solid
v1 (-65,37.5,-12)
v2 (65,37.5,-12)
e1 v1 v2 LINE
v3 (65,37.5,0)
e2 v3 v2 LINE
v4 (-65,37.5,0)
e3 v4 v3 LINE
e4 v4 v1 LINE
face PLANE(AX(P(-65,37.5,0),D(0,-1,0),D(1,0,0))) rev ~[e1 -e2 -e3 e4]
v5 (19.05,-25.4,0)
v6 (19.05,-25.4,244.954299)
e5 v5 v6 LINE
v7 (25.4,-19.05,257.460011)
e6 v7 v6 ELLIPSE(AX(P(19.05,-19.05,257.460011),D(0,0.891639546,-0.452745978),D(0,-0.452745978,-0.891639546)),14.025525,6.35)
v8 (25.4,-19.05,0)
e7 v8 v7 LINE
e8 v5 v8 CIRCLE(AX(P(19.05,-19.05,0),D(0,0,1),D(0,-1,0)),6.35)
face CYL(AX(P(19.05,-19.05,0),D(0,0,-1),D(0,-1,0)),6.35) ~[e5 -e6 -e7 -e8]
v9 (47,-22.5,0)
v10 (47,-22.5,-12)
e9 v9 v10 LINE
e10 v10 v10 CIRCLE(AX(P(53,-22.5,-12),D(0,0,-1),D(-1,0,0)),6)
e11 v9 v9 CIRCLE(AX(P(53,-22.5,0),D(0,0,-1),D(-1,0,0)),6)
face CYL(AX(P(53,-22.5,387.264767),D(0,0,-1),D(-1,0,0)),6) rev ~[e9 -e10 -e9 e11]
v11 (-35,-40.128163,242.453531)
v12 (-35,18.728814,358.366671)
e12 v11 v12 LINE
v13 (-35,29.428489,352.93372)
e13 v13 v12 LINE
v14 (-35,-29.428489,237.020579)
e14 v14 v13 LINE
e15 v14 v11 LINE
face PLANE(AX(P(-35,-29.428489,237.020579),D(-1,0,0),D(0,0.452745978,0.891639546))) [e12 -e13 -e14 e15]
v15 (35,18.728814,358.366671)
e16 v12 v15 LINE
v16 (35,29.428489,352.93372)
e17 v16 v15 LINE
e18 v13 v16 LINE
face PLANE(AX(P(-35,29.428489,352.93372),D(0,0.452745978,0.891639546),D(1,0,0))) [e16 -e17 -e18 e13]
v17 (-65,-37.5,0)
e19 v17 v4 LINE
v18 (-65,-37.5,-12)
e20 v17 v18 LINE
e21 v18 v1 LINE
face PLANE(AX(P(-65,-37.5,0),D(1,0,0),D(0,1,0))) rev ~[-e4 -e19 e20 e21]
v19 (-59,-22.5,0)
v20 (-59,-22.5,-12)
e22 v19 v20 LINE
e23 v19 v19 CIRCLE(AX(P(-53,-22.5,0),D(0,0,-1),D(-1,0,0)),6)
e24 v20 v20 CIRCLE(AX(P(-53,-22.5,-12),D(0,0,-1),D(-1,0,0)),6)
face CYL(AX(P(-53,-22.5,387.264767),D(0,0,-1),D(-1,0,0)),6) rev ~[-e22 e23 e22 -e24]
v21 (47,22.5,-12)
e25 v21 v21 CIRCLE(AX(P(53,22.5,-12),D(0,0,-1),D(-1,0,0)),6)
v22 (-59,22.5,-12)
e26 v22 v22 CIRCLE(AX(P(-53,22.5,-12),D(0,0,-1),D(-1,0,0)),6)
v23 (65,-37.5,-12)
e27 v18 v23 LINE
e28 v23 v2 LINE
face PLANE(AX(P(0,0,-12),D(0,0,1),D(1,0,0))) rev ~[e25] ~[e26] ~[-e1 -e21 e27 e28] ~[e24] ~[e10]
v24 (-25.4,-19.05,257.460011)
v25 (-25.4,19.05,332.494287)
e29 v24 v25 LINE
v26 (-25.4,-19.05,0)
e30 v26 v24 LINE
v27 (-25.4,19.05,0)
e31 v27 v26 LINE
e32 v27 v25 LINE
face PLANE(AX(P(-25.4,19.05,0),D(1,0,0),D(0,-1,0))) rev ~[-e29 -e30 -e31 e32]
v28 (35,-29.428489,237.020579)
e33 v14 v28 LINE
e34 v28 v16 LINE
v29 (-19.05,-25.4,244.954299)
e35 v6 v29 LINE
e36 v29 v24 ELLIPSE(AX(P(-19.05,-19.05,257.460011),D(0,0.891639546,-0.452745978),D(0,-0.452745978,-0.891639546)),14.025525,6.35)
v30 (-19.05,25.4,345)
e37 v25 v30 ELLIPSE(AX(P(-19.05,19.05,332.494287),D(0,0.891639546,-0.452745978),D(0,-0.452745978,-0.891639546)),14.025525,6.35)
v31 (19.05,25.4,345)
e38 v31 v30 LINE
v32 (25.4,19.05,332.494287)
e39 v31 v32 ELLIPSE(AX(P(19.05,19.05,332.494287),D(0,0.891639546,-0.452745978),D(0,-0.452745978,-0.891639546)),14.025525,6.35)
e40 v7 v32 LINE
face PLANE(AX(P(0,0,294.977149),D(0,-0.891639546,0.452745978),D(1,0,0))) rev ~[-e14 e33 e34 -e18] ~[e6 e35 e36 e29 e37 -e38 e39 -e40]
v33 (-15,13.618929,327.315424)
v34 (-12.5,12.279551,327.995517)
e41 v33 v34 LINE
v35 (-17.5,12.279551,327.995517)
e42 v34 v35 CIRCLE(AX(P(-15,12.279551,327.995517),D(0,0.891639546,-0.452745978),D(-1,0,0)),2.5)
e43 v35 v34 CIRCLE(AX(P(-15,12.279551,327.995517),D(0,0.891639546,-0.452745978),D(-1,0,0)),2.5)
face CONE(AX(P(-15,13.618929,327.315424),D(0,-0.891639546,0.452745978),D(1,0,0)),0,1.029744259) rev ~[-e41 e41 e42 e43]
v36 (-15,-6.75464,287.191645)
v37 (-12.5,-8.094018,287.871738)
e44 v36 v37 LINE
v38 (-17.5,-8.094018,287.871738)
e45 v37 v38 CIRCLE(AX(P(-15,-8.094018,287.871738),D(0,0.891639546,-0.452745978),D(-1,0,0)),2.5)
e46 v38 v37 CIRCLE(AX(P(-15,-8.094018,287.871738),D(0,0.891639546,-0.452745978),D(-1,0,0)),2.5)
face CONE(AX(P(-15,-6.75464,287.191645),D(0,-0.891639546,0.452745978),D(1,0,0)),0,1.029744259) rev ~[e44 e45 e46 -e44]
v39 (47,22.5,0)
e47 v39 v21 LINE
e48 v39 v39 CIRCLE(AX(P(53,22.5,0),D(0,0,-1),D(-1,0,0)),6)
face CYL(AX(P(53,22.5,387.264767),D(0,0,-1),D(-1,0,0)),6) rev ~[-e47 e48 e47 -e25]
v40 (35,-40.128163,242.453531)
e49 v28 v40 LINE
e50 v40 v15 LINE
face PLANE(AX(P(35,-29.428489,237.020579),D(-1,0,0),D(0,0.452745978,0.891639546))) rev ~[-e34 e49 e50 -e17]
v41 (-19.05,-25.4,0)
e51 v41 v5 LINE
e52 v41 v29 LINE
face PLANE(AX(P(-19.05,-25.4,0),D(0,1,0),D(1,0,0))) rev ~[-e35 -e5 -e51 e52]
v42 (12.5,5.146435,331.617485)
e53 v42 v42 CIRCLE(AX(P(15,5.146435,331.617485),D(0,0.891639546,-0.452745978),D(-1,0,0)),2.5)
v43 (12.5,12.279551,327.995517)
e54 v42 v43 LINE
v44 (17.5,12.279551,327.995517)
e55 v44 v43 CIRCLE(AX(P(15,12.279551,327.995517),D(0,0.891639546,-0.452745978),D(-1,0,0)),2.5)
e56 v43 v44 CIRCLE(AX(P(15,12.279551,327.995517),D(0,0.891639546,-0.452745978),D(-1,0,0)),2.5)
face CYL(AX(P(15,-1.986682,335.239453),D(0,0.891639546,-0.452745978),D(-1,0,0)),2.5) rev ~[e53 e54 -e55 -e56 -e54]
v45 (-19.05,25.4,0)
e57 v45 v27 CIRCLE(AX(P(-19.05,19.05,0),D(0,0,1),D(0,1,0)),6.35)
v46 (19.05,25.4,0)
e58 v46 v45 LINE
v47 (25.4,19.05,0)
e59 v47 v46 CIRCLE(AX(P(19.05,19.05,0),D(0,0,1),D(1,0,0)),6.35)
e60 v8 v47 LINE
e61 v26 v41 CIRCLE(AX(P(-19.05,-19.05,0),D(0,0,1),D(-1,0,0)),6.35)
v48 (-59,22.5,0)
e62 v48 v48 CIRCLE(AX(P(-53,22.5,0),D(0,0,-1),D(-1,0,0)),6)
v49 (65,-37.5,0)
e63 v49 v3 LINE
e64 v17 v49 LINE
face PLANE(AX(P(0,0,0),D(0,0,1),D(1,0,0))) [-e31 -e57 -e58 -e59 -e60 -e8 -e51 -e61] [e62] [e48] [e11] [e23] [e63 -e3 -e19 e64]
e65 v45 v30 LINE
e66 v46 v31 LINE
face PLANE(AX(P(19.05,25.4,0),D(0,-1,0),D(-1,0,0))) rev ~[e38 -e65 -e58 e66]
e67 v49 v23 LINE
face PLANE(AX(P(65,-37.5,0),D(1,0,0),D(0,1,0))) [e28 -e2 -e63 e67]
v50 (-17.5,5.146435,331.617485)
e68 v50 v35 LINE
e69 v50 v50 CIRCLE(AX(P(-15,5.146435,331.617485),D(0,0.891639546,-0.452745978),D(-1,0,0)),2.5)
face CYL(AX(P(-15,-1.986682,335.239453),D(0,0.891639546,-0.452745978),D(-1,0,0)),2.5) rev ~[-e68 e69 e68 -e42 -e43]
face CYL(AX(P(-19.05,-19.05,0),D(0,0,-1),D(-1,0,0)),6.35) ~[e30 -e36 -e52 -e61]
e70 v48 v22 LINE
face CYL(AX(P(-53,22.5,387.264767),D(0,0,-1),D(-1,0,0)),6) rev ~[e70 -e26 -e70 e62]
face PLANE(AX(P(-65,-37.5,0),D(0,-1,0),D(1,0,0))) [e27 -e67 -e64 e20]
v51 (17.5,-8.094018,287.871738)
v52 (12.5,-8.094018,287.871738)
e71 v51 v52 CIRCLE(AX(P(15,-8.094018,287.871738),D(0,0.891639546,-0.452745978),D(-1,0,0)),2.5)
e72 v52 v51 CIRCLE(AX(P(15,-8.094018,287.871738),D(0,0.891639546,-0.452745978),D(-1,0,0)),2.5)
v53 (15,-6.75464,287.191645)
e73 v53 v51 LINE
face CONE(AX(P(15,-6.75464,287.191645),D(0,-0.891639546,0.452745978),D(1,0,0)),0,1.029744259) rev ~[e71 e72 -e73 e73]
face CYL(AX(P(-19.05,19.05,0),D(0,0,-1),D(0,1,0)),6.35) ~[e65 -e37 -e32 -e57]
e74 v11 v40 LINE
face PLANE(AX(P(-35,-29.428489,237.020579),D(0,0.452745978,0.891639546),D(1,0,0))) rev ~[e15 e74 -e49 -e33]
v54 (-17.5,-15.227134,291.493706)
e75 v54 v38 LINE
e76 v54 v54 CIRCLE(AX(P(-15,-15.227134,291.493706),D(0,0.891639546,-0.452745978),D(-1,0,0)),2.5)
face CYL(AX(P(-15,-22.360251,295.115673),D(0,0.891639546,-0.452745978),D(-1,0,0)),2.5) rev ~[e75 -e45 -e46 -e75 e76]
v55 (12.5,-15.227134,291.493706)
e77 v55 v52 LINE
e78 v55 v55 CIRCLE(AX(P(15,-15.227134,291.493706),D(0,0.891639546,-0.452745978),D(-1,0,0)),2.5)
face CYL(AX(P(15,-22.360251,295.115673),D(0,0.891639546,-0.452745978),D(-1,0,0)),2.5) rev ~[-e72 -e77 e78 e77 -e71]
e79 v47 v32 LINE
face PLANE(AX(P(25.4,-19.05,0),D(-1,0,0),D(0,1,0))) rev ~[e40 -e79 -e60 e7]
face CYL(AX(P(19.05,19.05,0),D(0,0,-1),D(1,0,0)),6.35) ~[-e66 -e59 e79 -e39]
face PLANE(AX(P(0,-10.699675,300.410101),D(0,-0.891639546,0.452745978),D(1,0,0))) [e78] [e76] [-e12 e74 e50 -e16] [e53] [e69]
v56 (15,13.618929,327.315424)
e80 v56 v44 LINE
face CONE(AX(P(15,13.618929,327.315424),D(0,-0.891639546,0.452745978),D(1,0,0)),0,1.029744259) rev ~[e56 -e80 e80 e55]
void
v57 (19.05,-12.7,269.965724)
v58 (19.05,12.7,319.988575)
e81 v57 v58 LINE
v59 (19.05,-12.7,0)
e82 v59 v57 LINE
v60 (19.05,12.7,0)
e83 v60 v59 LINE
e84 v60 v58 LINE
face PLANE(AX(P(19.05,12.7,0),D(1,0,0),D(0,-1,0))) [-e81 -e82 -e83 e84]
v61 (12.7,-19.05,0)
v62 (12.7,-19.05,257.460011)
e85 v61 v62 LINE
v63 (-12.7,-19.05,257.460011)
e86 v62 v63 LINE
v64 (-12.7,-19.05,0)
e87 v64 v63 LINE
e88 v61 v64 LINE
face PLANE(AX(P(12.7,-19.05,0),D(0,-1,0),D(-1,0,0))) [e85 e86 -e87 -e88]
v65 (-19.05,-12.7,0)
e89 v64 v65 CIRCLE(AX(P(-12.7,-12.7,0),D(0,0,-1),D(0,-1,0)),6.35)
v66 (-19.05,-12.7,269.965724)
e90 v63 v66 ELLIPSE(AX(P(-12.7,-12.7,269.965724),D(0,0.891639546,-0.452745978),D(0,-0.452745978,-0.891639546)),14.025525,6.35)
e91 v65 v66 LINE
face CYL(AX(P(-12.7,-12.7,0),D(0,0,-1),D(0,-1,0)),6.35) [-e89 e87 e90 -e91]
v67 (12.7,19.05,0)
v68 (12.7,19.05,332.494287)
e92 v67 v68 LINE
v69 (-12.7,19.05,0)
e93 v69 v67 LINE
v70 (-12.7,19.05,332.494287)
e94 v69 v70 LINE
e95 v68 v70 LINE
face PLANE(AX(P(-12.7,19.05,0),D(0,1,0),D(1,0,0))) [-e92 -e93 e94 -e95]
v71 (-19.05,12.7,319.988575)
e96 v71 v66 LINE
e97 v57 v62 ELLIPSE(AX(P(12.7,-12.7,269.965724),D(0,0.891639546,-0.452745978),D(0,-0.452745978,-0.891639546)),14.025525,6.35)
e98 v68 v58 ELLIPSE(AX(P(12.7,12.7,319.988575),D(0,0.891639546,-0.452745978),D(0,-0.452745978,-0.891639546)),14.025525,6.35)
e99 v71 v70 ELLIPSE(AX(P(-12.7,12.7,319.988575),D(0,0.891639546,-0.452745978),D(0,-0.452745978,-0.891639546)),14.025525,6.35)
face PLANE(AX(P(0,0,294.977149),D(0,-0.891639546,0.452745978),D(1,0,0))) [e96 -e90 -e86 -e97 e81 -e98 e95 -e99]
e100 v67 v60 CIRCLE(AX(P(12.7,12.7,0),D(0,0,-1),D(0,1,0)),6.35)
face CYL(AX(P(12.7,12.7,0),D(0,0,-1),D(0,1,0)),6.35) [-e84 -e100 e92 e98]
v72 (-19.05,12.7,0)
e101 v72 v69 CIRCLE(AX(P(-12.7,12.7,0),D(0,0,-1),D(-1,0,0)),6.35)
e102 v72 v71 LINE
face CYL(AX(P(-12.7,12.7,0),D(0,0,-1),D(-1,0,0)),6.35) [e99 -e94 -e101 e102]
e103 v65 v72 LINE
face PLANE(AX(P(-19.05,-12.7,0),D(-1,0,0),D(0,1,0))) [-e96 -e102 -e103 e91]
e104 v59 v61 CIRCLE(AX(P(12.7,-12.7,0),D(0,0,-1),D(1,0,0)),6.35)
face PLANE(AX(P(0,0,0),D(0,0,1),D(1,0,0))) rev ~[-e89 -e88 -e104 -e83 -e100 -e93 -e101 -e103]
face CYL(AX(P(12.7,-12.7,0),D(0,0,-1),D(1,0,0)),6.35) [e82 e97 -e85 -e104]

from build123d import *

# Parameters (mm, degrees)
F0_W      = 130
F0_H      = 75
F1_DEPTH  = 12
F3_DEPTH  = 345
F5_D      = 12
F7_DEPTH  = 50.8
F8_W      = 70
F8_H      = 130
F9_DEPTH  = 12
F11_D     = 5
F11_DEPTH = 8
F11_TIP   = 1.5021515476


with BuildPart() as f1:
    # F0 (on Top) → F1 (new body)
    with BuildSketch(Plane.XY):
        Rectangle(F0_W, F0_H)
    extrude(amount=-F1_DEPTH)

    # F2 (on face) → F3 (join)
    with BuildSketch(Plane.XY):
        with BuildLine():
            Line((-19.05, -25.4), (19.05, -25.4))
            ThreePointArc((19.05, -25.4), (23.5401280605, -23.5401280605), (25.4, -19.05))
            Line((25.4, -19.05), (25.4, 19.05))
            ThreePointArc((25.4, 19.05), (23.5401280605, 23.5401280605), (19.05, 25.4))
            Line((19.05, 25.4), (-19.05, 25.4))
            ThreePointArc((-19.05, 25.4), (-23.5401280605, 23.5401280605), (-25.4, 19.05))
            Line((-25.4, 19.05), (-25.4, -19.05))
            ThreePointArc((-25.4, -19.05), (-23.5401280605, -23.5401280605), (-19.05, -25.4))
        make_face()
        with BuildLine():
            Line((-12.7, 19.05), (12.7, 19.05))
            ThreePointArc((12.7, 19.05), (17.1901280605, 17.1901280605), (19.05, 12.7))
            Line((19.05, 12.7), (19.05, -12.7))
            ThreePointArc((19.05, -12.7), (17.1901280605, -17.1901280605), (12.7, -19.05))
            Line((12.7, -19.05), (-12.7, -19.05))
            ThreePointArc((-12.7, -19.05), (-17.1901280605, -17.1901280605), (-19.05, -12.7))
            Line((-19.05, -12.7), (-19.05, 12.7))
            ThreePointArc((-19.05, 12.7), (-17.1901280605, 17.1901280605), (-12.7, 19.05))
        make_face(mode=Mode.SUBTRACT)
    extrude(amount=F3_DEPTH)

    # F5 (through all)
    with Locations(Plane.XY):
        with Locations((-53, 22.5), (53, 22.5), (53, -22.5), (-53, -22.5)):
            Hole(F5_D / 2)

    # F6 (on face) → F7 (cut)
    with BuildSketch(Plane.YZ.offset(25.4)):
        Polygon((-19.05, 345), (-25.4, 345), (-25.4, 244.9542985566), (-19.05, 257.460011237), align=None)
        Polygon((19.05, 345), (-19.05, 345), (-19.05, 257.460011237), (19.05, 332.4942873196), align=None)
        Polygon((25.4, 345), (19.05, 345), (19.05, 332.4942873196), align=None)
    extrude(amount=-F7_DEPTH, mode=Mode.SUBTRACT)

    # F8 (on face) → F9 (join)
    with BuildSketch(Plane(origin=(0, -119.0782097883, 60.4640976071), x_dir=(1, 0, 0), z_dir=(0, -0.8916395458, 0.4527459778))):
        with Locations((0, 263.0132913952)):
            Rectangle(F8_W, F8_H)
        with BuildLine():
            Line((25.4, 305.0898661941), (25.4, 220.9367165963))
            add(Edge.make_bspline(
                [(25.4, 220.9367165963), (25.4, 206.9111916633), (19.05, 206.9111916633)],
                knots=[4.7123889804, 4.7123889804, 4.7123889804, 6.2831853072, 6.2831853072, 6.2831853072], degree=2, weights=[1, 0.7071067812, 1]))
            Line((19.05, 206.9111916633), (-19.05, 206.9111916633))
            add(Edge.make_bspline(
                [(-19.05, 206.9111916633), (-25.4, 206.9111916633), (-25.4, 220.9367165963)],
                knots=[0, 0, 0, 1.5707963268, 1.5707963268, 1.5707963268], degree=2, weights=[1, 0.7071067812, 1]))
            Line((-25.4, 220.9367165963), (-25.4, 305.0898661941))
            add(Edge.make_bspline(
                [(-25.4, 305.0898661941), (-25.4, 319.115391127), (-19.05, 319.115391127)],
                knots=[1.5707963268, 1.5707963268, 1.5707963268, 3.1415926536, 3.1415926536, 3.1415926536], degree=2, weights=[1, 0.7071067812, 1]))
            Line((-19.05, 319.115391127), (19.05, 319.115391127))
            add(Edge.make_bspline(
                [(19.05, 319.115391127), (25.4, 319.115391127), (25.4, 305.0898661941)],
                knots=[3.1415926536, 3.1415926536, 3.1415926536, 4.7123889804, 4.7123889804, 4.7123889804], degree=2, weights=[1, 0.7071067812, 1]))
        make_face(mode=Mode.SUBTRACT)
        with BuildLine():
            add(Edge.make_bspline(
                [(25.4, 220.9367165963), (25.4, 206.9111916633), (19.05, 206.9111916633)],
                knots=[4.7123889804, 4.7123889804, 4.7123889804, 6.2831853072, 6.2831853072, 6.2831853072], degree=2, weights=[1, 0.7071067812, 1]))
            Line((25.4, 220.9367165963), (25.4, 305.0898661941))
            add(Edge.make_bspline(
                [(19.05, 319.115391127), (25.4, 319.115391127), (25.4, 305.0898661941)],
                knots=[3.1415926536, 3.1415926536, 3.1415926536, 4.7123889804, 4.7123889804, 4.7123889804], degree=2, weights=[1, 0.7071067812, 1]))
            Line((19.05, 319.115391127), (-19.05, 319.115391127))
            add(Edge.make_bspline(
                [(-25.4, 305.0898661941), (-25.4, 319.115391127), (-19.05, 319.115391127)],
                knots=[1.5707963268, 1.5707963268, 1.5707963268, 3.1415926536, 3.1415926536, 3.1415926536], degree=2, weights=[1, 0.7071067812, 1]))
            Line((-25.4, 305.0898661941), (-25.4, 220.9367165963))
            add(Edge.make_bspline(
                [(-19.05, 206.9111916633), (-25.4, 206.9111916633), (-25.4, 220.9367165963)],
                knots=[0, 0, 0, 1.5707963268, 1.5707963268, 1.5707963268], degree=2, weights=[1, 0.7071067812, 1]))
            Line((-19.05, 206.9111916633), (19.05, 206.9111916633))
        make_face()
        with BuildLine():
            Line((-19.05, 234.9622415292), (-19.05, 291.0643412611))
            add(Edge.make_bspline(
                [(-19.05, 291.0643412611), (-19.05, 305.0898661941), (-12.7, 305.0898661941)],
                knots=[1.5707963268, 1.5707963268, 1.5707963268, 3.1415926536, 3.1415926536, 3.1415926536], degree=2, weights=[1, 0.7071067812, 1]))
            Line((-12.7, 305.0898661941), (12.7, 305.0898661941))
            add(Edge.make_bspline(
                [(12.7, 305.0898661941), (19.05, 305.0898661941), (19.05, 291.0643412611)],
                knots=[3.1415926536, 3.1415926536, 3.1415926536, 4.7123889804, 4.7123889804, 4.7123889804], degree=2, weights=[1, 0.7071067812, 1]))
            Line((19.05, 291.0643412611), (19.05, 234.9622415292))
            add(Edge.make_bspline(
                [(19.05, 234.9622415292), (19.05, 220.9367165963), (12.7, 220.9367165963)],
                knots=[4.7123889804, 4.7123889804, 4.7123889804, 6.2831853072, 6.2831853072, 6.2831853072], degree=2, weights=[1, 0.7071067812, 1]))
            Line((12.7, 220.9367165963), (-12.7, 220.9367165963))
            add(Edge.make_bspline(
                [(-12.7, 220.9367165963), (-19.05, 220.9367165963), (-19.05, 234.9622415292)],
                knots=[0, 0, 0, 1.5707963268, 1.5707963268, 1.5707963268], degree=2, weights=[1, 0.7071067812, 1]))
        make_face(mode=Mode.SUBTRACT)
        with BuildLine():
            add(Edge.make_bspline(
                [(-19.05, 291.0643412611), (-19.05, 305.0898661941), (-12.7, 305.0898661941)],
                knots=[1.5707963268, 1.5707963268, 1.5707963268, 3.1415926536, 3.1415926536, 3.1415926536], degree=2, weights=[1, 0.7071067812, 1]))
            Line((-19.05, 291.0643412611), (-19.05, 234.9622415292))
            add(Edge.make_bspline(
                [(-12.7, 220.9367165963), (-19.05, 220.9367165963), (-19.05, 234.9622415292)],
                knots=[0, 0, 0, 1.5707963268, 1.5707963268, 1.5707963268], degree=2, weights=[1, 0.7071067812, 1]))
            Line((-12.7, 220.9367165963), (12.7, 220.9367165963))
            add(Edge.make_bspline(
                [(19.05, 234.9622415292), (19.05, 220.9367165963), (12.7, 220.9367165963)],
                knots=[4.7123889804, 4.7123889804, 4.7123889804, 6.2831853072, 6.2831853072, 6.2831853072], degree=2, weights=[1, 0.7071067812, 1]))
            Line((19.05, 234.9622415292), (19.05, 291.0643412611))
            add(Edge.make_bspline(
                [(12.7, 305.0898661941), (19.05, 305.0898661941), (19.05, 291.0643412611)],
                knots=[3.1415926536, 3.1415926536, 3.1415926536, 4.7123889804, 4.7123889804, 4.7123889804], degree=2, weights=[1, 0.7071067812, 1]))
            Line((12.7, 305.0898661941), (-12.7, 305.0898661941))
        make_face()
    extrude(amount=F9_DEPTH)

    # F11
    with Locations(Plane(origin=(0, -129.7778843376, 65.8970493408), x_dir=(1, 0, 0), z_dir=(0, -0.8916395458, 0.4527459778))):
        with Locations((15, 298.0132913952), (15, 253.0132913952), (-15, 253.0132913952), (-15, 298.0132913952)):
            Hole(F11_D / 2, depth=F11_DEPTH)
            with Locations((0, 0, -(F11_DEPTH + F11_TIP / 2))):  # 118° drill point
                Cone(0, F11_D / 2, F11_TIP, mode=Mode.SUBTRACT)


solid = f1.part
